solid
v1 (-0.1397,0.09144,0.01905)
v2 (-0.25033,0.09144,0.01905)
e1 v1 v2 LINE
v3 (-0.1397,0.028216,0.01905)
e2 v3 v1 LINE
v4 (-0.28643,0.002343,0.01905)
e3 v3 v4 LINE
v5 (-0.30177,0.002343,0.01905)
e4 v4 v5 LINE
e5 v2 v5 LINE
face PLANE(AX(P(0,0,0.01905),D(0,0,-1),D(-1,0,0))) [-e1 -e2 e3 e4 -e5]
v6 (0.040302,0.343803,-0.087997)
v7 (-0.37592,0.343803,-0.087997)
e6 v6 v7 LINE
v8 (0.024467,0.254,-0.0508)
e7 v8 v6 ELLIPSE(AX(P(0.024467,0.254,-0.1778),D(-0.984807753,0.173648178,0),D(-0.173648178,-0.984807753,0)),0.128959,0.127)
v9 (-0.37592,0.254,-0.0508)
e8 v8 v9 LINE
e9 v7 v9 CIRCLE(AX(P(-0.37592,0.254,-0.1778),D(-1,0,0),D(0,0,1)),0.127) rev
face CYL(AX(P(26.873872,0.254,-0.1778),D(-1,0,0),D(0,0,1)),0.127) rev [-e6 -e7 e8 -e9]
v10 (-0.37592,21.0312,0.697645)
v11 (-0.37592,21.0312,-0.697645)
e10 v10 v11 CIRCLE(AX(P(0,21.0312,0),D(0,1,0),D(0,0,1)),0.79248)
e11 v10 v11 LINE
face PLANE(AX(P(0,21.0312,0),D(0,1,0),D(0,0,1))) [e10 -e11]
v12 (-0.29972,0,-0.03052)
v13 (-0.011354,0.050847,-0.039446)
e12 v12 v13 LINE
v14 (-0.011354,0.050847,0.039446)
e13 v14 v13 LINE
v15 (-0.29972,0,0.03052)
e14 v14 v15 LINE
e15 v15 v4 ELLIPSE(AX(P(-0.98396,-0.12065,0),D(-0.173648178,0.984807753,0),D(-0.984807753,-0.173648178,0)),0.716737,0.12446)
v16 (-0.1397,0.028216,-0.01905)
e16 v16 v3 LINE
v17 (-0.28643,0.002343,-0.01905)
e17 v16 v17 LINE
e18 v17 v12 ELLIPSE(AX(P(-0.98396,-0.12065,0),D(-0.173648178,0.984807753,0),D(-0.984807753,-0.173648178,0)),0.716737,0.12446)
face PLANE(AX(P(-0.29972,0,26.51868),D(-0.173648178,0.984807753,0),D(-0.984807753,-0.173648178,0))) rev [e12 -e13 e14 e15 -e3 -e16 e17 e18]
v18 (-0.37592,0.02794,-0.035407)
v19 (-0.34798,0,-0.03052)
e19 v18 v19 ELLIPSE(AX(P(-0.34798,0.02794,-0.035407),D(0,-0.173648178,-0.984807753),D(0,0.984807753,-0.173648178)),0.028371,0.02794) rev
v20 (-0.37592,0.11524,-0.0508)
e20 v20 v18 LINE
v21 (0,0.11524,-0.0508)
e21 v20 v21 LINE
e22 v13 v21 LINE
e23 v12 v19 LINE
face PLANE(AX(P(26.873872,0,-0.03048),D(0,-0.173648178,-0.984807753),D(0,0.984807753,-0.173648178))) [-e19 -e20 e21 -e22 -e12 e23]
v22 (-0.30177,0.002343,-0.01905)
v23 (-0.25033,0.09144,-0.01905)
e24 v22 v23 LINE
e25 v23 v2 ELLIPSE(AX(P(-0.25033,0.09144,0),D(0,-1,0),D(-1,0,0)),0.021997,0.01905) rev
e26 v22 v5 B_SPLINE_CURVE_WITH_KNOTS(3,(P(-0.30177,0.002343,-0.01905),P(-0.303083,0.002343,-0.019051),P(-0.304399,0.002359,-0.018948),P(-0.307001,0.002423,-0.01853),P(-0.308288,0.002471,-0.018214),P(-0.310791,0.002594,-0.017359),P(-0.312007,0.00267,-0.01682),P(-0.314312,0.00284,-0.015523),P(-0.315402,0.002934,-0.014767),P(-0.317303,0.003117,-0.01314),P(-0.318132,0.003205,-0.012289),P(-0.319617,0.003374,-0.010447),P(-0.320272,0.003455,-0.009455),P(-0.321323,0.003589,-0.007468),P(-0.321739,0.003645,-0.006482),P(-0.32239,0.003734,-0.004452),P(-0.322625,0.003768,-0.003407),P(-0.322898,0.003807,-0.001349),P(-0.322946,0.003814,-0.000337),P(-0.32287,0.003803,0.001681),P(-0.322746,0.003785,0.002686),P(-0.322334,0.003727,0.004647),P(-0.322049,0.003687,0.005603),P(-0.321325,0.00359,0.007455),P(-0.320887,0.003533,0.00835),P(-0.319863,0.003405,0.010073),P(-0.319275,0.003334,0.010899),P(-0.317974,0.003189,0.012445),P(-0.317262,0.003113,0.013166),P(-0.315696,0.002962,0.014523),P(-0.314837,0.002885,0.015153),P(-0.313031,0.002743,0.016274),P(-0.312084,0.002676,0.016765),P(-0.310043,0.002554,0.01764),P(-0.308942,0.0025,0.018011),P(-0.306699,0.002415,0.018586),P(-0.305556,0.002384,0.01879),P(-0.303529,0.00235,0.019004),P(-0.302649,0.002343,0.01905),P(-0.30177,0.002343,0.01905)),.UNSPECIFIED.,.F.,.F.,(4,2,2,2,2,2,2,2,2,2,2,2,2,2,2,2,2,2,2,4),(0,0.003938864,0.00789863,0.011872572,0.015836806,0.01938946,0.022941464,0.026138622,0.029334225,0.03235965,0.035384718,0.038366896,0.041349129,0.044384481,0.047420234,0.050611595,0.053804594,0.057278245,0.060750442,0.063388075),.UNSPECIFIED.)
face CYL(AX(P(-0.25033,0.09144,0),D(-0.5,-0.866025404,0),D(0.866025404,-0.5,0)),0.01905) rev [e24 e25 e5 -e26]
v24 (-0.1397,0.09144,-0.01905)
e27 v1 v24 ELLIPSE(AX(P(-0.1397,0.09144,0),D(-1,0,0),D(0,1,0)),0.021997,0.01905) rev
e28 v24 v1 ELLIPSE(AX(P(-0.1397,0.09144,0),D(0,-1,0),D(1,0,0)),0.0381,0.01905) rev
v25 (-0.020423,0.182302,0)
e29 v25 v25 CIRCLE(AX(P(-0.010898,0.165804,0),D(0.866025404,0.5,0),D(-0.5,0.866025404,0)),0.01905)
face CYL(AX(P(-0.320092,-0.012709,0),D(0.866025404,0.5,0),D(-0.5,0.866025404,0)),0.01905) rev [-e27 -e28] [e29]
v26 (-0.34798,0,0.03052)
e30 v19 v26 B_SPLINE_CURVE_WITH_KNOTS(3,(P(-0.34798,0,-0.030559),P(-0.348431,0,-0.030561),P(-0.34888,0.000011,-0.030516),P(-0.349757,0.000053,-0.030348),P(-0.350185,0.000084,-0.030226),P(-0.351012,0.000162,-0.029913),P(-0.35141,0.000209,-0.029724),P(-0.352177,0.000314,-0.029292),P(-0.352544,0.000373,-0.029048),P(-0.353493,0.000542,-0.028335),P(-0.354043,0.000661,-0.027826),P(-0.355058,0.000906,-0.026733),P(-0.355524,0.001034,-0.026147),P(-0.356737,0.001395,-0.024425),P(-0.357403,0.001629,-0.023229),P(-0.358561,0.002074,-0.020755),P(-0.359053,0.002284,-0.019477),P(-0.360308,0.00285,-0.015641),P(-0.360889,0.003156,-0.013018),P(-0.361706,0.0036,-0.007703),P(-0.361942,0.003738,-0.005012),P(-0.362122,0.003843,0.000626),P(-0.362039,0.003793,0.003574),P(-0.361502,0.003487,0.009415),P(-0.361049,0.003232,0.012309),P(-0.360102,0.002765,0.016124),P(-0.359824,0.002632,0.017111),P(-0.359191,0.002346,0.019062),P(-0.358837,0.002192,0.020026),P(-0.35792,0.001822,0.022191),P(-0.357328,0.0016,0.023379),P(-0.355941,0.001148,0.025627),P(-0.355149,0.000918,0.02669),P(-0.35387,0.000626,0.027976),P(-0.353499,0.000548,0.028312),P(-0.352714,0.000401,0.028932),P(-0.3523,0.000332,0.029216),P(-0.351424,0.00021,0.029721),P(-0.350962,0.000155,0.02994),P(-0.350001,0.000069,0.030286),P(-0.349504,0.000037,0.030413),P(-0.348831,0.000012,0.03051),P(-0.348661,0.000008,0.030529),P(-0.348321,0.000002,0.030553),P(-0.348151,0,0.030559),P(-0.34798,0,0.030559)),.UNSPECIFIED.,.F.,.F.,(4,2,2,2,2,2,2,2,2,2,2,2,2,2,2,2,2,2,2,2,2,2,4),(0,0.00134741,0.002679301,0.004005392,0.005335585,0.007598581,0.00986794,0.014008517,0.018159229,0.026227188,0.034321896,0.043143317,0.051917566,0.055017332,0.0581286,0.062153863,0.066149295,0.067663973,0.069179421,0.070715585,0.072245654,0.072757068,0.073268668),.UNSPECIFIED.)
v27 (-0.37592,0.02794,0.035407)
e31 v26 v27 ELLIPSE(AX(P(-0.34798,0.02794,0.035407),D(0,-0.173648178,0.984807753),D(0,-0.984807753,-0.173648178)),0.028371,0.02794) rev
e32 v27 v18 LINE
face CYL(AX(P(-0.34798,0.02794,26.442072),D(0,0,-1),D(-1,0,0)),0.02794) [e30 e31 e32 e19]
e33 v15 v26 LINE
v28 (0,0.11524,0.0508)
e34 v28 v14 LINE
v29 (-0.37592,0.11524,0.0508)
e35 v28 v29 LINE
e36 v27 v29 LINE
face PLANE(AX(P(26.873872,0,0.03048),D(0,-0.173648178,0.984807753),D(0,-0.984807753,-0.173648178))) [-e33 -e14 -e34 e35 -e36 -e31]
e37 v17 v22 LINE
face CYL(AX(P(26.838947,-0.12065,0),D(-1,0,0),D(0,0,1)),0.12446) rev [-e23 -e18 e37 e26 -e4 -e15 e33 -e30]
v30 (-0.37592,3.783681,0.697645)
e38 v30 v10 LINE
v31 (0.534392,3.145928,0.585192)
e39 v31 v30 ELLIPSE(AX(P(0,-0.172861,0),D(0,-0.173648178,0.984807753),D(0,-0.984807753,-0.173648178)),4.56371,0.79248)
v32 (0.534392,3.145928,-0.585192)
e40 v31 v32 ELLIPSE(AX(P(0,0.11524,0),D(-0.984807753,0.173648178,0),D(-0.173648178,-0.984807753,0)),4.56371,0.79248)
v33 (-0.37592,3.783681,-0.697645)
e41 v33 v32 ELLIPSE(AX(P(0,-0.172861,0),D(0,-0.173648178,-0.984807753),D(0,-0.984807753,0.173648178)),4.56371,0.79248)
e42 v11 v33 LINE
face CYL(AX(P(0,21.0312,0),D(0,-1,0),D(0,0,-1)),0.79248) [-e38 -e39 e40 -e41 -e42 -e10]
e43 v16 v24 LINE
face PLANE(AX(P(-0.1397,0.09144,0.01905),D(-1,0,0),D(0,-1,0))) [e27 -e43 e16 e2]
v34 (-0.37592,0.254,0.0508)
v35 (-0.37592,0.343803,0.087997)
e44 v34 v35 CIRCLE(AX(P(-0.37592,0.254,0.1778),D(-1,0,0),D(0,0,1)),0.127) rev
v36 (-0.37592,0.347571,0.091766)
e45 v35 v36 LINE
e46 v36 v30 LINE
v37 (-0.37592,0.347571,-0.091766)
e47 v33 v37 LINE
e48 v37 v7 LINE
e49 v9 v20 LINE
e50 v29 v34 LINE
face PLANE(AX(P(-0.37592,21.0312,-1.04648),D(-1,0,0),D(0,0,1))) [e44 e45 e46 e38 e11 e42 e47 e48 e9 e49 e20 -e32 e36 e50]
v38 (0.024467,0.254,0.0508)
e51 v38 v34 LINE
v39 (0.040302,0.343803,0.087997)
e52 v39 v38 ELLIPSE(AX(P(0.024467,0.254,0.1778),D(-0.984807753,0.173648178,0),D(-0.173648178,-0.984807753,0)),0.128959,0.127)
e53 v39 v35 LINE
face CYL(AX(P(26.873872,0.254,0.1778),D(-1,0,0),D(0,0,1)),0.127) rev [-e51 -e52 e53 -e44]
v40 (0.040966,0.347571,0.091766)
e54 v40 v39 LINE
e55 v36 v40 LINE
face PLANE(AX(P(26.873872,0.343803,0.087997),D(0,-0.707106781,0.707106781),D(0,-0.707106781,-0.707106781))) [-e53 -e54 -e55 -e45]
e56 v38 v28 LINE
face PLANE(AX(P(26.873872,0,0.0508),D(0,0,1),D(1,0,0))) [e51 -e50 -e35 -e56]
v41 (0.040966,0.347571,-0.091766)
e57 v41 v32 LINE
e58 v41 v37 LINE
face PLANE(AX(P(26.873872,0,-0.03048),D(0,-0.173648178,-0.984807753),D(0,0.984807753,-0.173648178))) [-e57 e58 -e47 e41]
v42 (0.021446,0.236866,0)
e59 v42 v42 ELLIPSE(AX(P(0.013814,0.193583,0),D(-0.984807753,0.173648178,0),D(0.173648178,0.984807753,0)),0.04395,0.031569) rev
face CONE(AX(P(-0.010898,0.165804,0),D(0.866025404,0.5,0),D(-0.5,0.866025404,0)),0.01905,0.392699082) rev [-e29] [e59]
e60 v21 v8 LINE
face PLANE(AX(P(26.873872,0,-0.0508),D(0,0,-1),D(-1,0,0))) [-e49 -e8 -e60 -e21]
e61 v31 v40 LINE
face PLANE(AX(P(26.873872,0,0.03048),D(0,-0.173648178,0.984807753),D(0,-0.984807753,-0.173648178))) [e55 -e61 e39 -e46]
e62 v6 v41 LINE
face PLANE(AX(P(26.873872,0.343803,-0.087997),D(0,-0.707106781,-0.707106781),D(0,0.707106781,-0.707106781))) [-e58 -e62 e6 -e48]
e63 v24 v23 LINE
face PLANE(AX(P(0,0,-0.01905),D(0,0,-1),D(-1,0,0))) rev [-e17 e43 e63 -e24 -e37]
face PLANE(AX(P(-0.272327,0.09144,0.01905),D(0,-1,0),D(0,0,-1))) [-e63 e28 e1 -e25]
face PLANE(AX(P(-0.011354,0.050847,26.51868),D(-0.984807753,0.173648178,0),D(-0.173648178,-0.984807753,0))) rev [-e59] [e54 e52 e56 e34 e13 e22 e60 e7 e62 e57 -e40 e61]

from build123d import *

# Parameters (mm, degrees)
TD_SKETCH_R                             = 0.79248
TL_FEATURE_DEPTH                        = 21.0312
TDF_STD_SKETCH_W                        = 2.09296
TDF_STD_SKETCH_H                        = 2.09296
TDF_STD_FEATURE_DEPTH                   = 22.061040395
ISA_20_STD_FEATURE_DEPTH                = 22.061040395
ISA_20_STD_FEATURE_DEPTH_BACK           = 22.061040395
VW_STD_FEATURE_DEPTH                    = 22.061040395
VW_STD_FEATURE_DEPTH_BACK               = 22.061040395
F_10BA_STD_FEATURE_DEPTH                = 22.061040503
F_10BA_STD_FEATURE_DEPTH_BACK           = 22.061040503
FRO_STD_FEATURE_DEPTH                   = 22.061040395
FRO_STD_FEATURE_DEPTH_BACK              = 22.061040395
C_STD_FEATURE_DEPTH                     = 22.061040395
C_STD_FEATURE_DEPTH_BACK                = 22.061040395
ERW_STD_FEATURE_DEPTH                   = 0.01905
H_STD_FEATURE_REACH                     = 22.896
H_STD_SKETCH_R                          = 0.01905
H_STD_SKETCH_3_R                        = 0.01905
FUNNEL_FINAL_DIAMETRE_STD_FEATURE_DEPTH = 2.499995
FUNNEL_FINAL_DIAMETRE_STD_FEATURE_DRAFT = -22.5
ROUND_BR_STD_FEATURE_START              = -1
ROUND_BR_STD_FEATURE_DEPTH              = 1.009339363


with BuildPart() as part:
    # TD_sketch → TL_feature (new body)
    with BuildSketch(Plane(origin=(0, 0, 0), x_dir=(1, 0, 0), z_dir=(0, 1, 0))):
        with Locations(Location((0, 0, 0), (0, 0, 270))):
            Circle(TD_SKETCH_R)
    extrude(amount=TL_FEATURE_DEPTH)

    # TDF_STD_sketch → TDF_STD_feature (cut, through all)
    with BuildSketch(Plane(origin=(0, 0, 0), x_dir=(1, 0, 0), z_dir=(0, 1, 0))):
        with Locations((-1.4224, 0)):
            Rectangle(TDF_STD_SKETCH_W, TDF_STD_SKETCH_H)
    extrude(amount=TDF_STD_FEATURE_DEPTH, mode=Mode.SUBTRACT)

    # ISA_20_STD_sketch → ISA_20_STD_feature (cut, two sides: drawn at the far end of the back side and taken through both)
    with BuildSketch(Plane(origin=(0, 0, 0), x_dir=(0, 0, -1), z_dir=(1, 0, 0)).offset(-ISA_20_STD_FEATURE_DEPTH_BACK)):
        Polygon((-12.946999885, 73.253224398), (-3.738847997, 21.0312), (-0.03048, 0), (0.03048, 0), (3.738847997, 21.0312), (12.946999885, 73.253224398), (12.946999885, -32.802042202), (-12.946999885, -32.802042202), align=None)
    extrude(amount=ISA_20_STD_FEATURE_DEPTH + ISA_20_STD_FEATURE_DEPTH_BACK, mode=Mode.SUBTRACT)

    # VW_STD_sketch → VW_STD_feature (cut, two sides: drawn at the far end of the back side and taken through both)
    with BuildSketch(Plane(origin=(0, 0, 0), x_dir=(0, 0, -1), z_dir=(1, 0, 0)).offset(-VW_STD_FEATURE_DEPTH_BACK)):
        with BuildLine():
            Line((-70.448918022, 70.704723144), (-20.775394878, 21.0312))
            Line((-20.775394878, 21.0312), (-0.087997439, 0.343802561))
            ThreePointArc((-0.087997439, 0.343802561), (-0.060467299, 0.302600796), (-0.0508, 0.254))
            Line((-0.0508, 0.254), (-0.0508, 0))
            Line((-0.0508, 0), (0.0508, 0))
            Line((0.0508, 0), (0.0508, 0.254))
            ThreePointArc((0.0508, 0.254), (0.060467299, 0.302600796), (0.087997439, 0.343802561))
            Line((0.087997439, 0.343802561), (20.775394878, 21.0312))
            Line((20.775394878, 21.0312), (70.448918022, 70.704723144))
            Line((70.448918022, 70.704723144), (70.448918022, -69.793217099))
            Line((70.448918022, -69.793217099), (-70.448918022, -69.793217099))
            Line((-70.448918022, -69.793217099), (-70.448918022, 70.704723144))
        make_face()
    extrude(amount=VW_STD_FEATURE_DEPTH + VW_STD_FEATURE_DEPTH_BACK, mode=Mode.SUBTRACT)

    # 10BA_STD_sketch → 10BA_STD_feature (cut, two sides: drawn at the far end of the back side and taken through both)
    with BuildSketch(Plane.XY.offset(-F_10BA_STD_FEATURE_DEPTH_BACK)):
        Polygon((-53.216424868, 0), (-0.37592, 0), (-0.29972, 0), (-0.011354365, 0.050846642), (3.688047997, 21.0312), (12.863705374, 73.068938867), (91.245890155, 2.183757568), (25.165759913, -70.885181299), align=None)
    extrude(amount=F_10BA_STD_FEATURE_DEPTH + F_10BA_STD_FEATURE_DEPTH_BACK, mode=Mode.SUBTRACT)

    # FRO_STD_sketch → FRO_STD_feature (cut, two sides: drawn at the far end of the back side and taken through both)
    with BuildSketch(Plane.XY.offset(-FRO_STD_FEATURE_DEPTH_BACK)):
        with BuildLine():
            Line((-0.37592, 52.152138388), (-0.37592, 0.02794))
            ThreePointArc((-0.37592, 0.02794), (-0.367736563, 0.008183437), (-0.34798, 0))
            Line((-0.34798, 0), (51.776218388, 0))
            Line((51.776218388, 0), (-21.9385299, -73.714748288))
            Line((-21.9385299, -73.714748288), (-74.090668288, -21.5626099))
            Line((-74.090668288, -21.5626099), (-0.37592, 52.152138388))
        make_face()
    extrude(amount=FRO_STD_FEATURE_DEPTH + FRO_STD_FEATURE_DEPTH_BACK, mode=Mode.SUBTRACT)

    # C_STD_sketch → C_STD_feature (cut, two sides: drawn at the far end of the back side and taken through both)
    with BuildSketch(Plane(origin=(0, 0, 0), x_dir=(0, 0, -1), z_dir=(1, 0, 0)).offset(-C_STD_FEATURE_DEPTH_BACK)):
        with BuildLine():
            Line((-50.530423385, -12.791040855), (-0.030559272, 0))
            ThreePointArc((-0.030559272, 0), (0, 0.00381), (0.030559272, 0))
            Line((0.030559272, 0), (50.530423385, -12.791040855))
            Line((50.530423385, -12.791040855), (50.530423385, -116.980234183))
            Line((50.530423385, -116.980234183), (-50.530423385, -116.980234183))
            Line((-50.530423385, -116.980234183), (-50.530423385, -12.791040855))
        make_face()
    extrude(amount=C_STD_FEATURE_DEPTH + C_STD_FEATURE_DEPTH_BACK, mode=Mode.SUBTRACT)


with BuildPart() as body_2:
    # ERW_STD_sketch → ERW_STD_feature (new, symmetric)
    with BuildSketch(Plane.XY):
        Polygon((-0.1397, 0.09144), (-0.1397, 0), (-0.32512, 0), (-0.272327091, 0.09144), align=None)
    extrude(amount=ERW_STD_FEATURE_DEPTH, both=True)

    # H_STD_sketch → H_STD_feature (add, up to next)
    with BuildSketch(Plane(origin=(-0.010897713, 0.165804035, 0), x_dir=(0, 0, -1), z_dir=(0.8660254037844415, 0.4999999999999953, 0)), mode=Mode.PRIVATE) as h_std_feature_sk1:
        with Locations(Location((0, 0, 0), (0, 0, 90))):
            Circle(H_STD_SKETCH_R)
    h_std_feature_tool1 = extrude(h_std_feature_sk1.sketch, amount=-H_STD_FEATURE_REACH, mode=Mode.PRIVATE) - body_2.part
    add(h_std_feature_tool1.solids().sort_by_distance((-0.010898, 0.165804, 0))[0])


with BuildPart() as funnel_final_diametre_std_feature_tool:
    # H_STD_sketch<3> → funnel_final_diametre_STD_feature (with draft: the straight prism first)
    with BuildSketch(Plane(origin=(-0.010897713, 0.165804035, 0), x_dir=(0, 0, -1), z_dir=(0.8660254037844415, 0.4999999999999953, 0))):
        with Locations(Location((0, 0, 0), (0, 0, 90))):
            Circle(H_STD_SKETCH_3_R)
    extrude(amount=FUNNEL_FINAL_DIAMETRE_STD_FEATURE_DEPTH)
    # funnel_final_diametre_STD_feature: the draft: its side faces are tilted about the plane it starts from
    funnel_final_diametre_std_feature_sides = [funnel_final_diametre_std_feature_tool.faces().sort_by_distance(p)[0] for p in [
        (1.081156877, 0.774305001, 0),
    ]]
    draft(funnel_final_diametre_std_feature_sides, Plane(origin=(-0.010897713, 0.165804035, 0), x_dir=(0, 0, -1), z_dir=(0.8660254037844415, 0.4999999999999953, 0)), FUNNEL_FINAL_DIAMETRE_STD_FEATURE_DRAFT)


with BuildPart() as body_2_1:
    add(body_2.part)

    # funnel_final_diametre_STD_feature: add funnel_final_diametre_std_feature_tool
    add(funnel_final_diametre_std_feature_tool.part)

    # ROUND_BR_STD_feature: read off the stored shape, not the designer's step
    # ROUND_BR_STD_feature outline → ROUND_BR_STD_feature (cut)
    with BuildSketch(Plane(origin=(0, 0, 0), x_dir=(0.8660254037844362, -0.5000000000000042, 0), z_dir=(0.5000000000000042, 0.8660254037844363, 0)).offset(ROUND_BR_STD_FEATURE_START)):
        with BuildLine():
            Line((-0.281562179, -0.01905), (-0.262512179, -0.01905))
            ThreePointArc((-0.262512179, -0.01905), (-0.275982563, -0.013470384), (-0.281562179, 0))
            Line((-0.281562179, 0), (-0.281562179, -0.01905))
        make_face()
        with BuildLine():
            Line((-0.281562179, 0.01905), (-0.281562179, 0))
            ThreePointArc((-0.281562179, 0), (-0.275982563, 0.013470384), (-0.262512179, 0.01905))
            Line((-0.262512179, 0.01905), (-0.281562179, 0.01905))
        make_face()
    extrude(amount=ROUND_BR_STD_FEATURE_DEPTH, mode=Mode.SUBTRACT)


with BuildPart() as part_1:
    add(part.part)

    # COMBINE_STD_feature: cut body 2
    add(body_2_1.part, mode=Mode.SUBTRACT)


solid = part_1.part
